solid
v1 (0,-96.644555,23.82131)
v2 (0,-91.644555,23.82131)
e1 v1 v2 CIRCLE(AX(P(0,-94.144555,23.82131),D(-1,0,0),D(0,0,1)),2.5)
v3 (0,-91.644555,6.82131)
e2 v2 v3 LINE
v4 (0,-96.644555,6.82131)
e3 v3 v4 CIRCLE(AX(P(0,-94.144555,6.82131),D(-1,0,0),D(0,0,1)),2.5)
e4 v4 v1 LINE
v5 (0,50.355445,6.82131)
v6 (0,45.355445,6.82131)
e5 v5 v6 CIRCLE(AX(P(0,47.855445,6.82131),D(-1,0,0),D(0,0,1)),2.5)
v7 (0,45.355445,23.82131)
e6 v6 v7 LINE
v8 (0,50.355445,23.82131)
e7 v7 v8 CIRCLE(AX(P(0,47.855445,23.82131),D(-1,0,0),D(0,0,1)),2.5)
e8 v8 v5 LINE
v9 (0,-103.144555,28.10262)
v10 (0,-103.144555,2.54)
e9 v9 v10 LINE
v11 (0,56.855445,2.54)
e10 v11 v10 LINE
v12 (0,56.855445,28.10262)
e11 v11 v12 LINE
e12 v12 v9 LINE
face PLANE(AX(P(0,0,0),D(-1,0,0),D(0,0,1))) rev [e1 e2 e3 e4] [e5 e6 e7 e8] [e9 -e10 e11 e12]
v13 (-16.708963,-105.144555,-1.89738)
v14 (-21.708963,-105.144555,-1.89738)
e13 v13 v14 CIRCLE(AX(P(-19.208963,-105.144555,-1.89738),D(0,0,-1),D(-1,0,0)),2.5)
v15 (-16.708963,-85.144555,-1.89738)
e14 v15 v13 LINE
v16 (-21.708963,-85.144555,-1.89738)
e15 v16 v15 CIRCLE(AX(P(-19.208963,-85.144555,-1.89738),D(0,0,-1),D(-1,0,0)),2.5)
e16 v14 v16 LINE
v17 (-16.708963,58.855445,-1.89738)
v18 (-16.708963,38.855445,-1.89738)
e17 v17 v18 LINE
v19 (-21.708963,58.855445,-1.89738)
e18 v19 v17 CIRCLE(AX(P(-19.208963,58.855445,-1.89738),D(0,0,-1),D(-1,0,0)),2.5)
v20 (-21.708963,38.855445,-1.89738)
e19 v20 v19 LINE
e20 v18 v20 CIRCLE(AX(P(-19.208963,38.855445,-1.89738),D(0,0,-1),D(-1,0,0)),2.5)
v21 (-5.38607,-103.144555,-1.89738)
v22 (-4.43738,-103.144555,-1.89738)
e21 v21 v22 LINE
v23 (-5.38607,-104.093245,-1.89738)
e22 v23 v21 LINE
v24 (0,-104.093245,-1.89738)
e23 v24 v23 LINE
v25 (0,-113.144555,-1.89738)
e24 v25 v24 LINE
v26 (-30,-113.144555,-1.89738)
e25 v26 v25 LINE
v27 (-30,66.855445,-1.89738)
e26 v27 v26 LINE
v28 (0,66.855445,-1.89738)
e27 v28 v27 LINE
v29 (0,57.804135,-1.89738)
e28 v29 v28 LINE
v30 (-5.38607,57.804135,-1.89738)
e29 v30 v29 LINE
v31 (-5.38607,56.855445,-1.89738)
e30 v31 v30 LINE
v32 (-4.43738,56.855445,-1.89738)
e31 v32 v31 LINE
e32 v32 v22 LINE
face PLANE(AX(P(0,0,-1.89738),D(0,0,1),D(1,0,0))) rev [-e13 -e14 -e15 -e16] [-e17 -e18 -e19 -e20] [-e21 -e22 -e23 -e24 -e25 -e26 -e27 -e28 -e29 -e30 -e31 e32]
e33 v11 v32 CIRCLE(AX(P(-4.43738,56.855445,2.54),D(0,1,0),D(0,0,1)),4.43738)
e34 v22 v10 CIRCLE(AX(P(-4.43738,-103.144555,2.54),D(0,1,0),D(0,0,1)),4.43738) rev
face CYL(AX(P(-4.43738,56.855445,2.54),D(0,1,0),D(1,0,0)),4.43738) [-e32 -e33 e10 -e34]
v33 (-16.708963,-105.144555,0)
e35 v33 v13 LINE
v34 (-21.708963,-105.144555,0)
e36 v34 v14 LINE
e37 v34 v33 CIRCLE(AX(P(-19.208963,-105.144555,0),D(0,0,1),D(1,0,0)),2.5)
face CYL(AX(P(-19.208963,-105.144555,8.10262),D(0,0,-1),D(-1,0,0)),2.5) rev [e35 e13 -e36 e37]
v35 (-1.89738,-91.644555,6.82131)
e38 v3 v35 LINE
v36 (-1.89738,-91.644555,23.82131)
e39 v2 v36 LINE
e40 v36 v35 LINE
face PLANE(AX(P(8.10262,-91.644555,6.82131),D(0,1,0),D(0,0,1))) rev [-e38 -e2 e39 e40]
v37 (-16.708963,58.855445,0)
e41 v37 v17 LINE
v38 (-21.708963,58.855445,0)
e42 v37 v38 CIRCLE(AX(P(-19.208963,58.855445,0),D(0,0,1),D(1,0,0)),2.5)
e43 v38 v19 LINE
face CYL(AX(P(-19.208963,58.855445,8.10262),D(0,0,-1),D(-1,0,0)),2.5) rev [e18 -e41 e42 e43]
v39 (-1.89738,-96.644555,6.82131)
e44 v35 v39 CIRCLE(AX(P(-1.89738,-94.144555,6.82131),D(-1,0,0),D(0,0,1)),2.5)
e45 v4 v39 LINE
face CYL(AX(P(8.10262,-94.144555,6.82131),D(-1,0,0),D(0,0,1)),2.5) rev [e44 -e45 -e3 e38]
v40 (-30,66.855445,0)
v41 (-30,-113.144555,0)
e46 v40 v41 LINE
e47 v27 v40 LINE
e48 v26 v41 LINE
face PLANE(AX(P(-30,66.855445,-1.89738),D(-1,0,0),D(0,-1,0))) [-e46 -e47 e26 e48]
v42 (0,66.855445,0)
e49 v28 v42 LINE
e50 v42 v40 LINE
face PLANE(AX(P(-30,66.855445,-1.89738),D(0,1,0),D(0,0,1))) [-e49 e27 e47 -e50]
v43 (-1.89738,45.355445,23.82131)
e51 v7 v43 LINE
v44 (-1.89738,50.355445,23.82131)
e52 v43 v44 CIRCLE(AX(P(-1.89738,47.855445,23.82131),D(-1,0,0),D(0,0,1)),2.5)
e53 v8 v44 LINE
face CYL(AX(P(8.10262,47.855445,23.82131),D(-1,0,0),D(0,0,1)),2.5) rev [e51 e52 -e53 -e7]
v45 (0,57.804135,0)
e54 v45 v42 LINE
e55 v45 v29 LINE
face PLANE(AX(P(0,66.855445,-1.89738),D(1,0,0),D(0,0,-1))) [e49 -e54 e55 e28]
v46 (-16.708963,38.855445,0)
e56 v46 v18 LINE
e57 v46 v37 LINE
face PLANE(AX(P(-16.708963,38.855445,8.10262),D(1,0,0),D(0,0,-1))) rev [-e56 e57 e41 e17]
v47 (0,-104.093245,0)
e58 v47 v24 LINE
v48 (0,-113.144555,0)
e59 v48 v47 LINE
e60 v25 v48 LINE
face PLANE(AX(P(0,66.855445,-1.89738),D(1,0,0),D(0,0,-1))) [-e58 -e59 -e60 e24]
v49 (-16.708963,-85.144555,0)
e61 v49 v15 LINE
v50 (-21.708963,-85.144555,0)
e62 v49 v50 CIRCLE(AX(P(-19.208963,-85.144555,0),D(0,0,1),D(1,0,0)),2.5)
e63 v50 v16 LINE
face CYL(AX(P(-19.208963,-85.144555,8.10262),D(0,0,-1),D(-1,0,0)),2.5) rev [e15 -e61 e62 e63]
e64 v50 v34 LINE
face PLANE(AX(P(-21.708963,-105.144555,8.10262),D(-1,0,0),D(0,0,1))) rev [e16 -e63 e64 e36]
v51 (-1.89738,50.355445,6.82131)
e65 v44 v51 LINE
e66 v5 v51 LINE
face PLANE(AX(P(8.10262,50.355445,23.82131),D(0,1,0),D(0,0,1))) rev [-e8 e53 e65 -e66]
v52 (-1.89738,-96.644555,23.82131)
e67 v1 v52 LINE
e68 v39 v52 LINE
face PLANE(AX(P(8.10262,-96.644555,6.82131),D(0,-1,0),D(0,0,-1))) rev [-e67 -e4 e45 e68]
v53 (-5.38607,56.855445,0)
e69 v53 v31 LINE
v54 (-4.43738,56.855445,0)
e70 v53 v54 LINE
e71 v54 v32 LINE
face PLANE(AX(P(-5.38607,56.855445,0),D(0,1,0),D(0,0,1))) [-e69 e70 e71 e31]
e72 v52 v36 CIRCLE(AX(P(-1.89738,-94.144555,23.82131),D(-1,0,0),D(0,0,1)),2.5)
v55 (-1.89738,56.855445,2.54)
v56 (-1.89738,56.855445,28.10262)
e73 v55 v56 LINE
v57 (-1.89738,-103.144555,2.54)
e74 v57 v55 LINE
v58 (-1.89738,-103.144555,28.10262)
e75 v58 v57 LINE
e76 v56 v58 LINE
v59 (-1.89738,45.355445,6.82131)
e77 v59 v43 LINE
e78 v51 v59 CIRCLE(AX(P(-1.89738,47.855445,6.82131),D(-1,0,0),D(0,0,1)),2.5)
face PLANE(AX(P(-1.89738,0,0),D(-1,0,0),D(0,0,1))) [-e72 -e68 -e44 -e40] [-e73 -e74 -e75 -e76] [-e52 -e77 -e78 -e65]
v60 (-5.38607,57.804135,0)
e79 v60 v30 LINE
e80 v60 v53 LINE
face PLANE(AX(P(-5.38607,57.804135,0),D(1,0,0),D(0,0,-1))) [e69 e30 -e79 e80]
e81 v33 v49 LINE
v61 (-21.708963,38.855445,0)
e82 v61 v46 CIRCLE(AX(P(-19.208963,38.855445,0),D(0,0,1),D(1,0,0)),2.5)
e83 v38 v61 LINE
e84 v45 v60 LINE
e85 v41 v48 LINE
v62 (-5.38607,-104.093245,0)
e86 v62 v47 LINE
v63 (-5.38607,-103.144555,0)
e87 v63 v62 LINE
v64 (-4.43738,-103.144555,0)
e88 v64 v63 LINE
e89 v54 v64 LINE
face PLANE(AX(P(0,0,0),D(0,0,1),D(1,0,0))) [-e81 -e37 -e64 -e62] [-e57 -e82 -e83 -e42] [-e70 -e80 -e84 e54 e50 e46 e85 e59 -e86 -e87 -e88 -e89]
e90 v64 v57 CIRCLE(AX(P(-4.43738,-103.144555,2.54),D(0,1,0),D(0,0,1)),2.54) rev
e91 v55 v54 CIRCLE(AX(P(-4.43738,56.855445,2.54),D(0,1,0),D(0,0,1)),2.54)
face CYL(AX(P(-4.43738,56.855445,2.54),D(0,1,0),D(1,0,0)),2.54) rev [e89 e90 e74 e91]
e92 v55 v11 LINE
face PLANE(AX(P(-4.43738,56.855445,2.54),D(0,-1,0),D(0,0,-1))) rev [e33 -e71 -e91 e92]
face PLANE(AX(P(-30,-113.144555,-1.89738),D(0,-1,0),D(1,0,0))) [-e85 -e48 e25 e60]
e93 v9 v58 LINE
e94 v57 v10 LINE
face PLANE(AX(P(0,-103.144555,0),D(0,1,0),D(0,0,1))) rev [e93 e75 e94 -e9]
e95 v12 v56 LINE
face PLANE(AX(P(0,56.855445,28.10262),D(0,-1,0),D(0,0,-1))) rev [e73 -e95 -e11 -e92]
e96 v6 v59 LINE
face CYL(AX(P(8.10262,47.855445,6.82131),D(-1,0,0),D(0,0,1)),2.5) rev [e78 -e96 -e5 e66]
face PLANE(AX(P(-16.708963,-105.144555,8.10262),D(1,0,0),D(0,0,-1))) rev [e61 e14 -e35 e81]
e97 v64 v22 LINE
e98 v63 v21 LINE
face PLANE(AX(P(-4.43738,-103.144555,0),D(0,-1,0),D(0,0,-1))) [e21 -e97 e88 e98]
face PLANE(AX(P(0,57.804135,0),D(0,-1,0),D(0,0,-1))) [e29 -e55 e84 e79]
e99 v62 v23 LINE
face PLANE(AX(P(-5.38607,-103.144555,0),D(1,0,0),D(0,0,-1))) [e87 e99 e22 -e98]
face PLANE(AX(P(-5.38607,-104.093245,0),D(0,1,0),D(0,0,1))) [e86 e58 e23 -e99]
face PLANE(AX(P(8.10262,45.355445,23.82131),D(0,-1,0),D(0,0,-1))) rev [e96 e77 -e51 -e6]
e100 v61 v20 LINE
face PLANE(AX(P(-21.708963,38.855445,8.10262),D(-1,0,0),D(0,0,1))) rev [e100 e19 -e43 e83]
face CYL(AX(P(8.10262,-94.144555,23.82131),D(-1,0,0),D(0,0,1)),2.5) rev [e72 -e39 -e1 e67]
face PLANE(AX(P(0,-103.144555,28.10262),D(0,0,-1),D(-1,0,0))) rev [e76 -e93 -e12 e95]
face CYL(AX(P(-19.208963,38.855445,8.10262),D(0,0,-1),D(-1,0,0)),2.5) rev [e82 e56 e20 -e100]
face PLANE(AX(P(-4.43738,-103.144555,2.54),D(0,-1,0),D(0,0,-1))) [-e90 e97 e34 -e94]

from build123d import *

# Parameters (mm, degrees)
SKETCH1_W                     = 30
SKETCH1_H                     = 180
BASE_FLANGE1_DEPTH            = 1.89738
EDGE_FLANGE1_STRIP_W          = 12.66952
EDGE_FLANGE1_STRIP_H          = 1.89738
EDGE_FLANGE1_STRIP_CUT_DEPTH  = 160
EDGE_FLANGE1_RELIEF_W         = 13.61821
EDGE_FLANGE1_RELIEF_H         = 0.94869
EDGE_FLANGE1_RELIEF_CUT_DEPTH = 1.89738
EDGE_FLANGE1_DEPTH            = 160
CUT_EXTRUDE1_DEPTH            = 10
CUT_EXTRUDE2_DEPTH            = 10


# Sheet-metal steps are written as plain solids
with BuildPart() as part:
    # Sketch1 → Base-Flange1 (new body)
    with BuildSketch(Plane.XY):
        with Locations((-15, -23.144555198)):
            Rectangle(SKETCH1_W, SKETCH1_H)
    extrude(amount=-BASE_FLANGE1_DEPTH)

    # Edge-Flange1 strip (across the edge) → Edge-Flange1 strip cut (cut)
    with BuildSketch(Plane(origin=(0, -103.144555198, 0), x_dir=(-1, 0, 0), z_dir=(0, 1, 0))):
        with Locations((-1.89738, -0.94869)):
            Rectangle(EDGE_FLANGE1_STRIP_W, EDGE_FLANGE1_STRIP_H)
    extrude(amount=EDGE_FLANGE1_STRIP_CUT_DEPTH, mode=Mode.SUBTRACT)

    # Edge-Flange1 relief (on the sheet) → Edge-Flange1 relief cut (cut)
    with BuildSketch(Plane(origin=(-4.43738, -103.144555198, 0), x_dir=(-1, 0, 0), z_dir=(0, 0, 1))):
        with Locations((-5.860415, 0.474345)):
            Rectangle(EDGE_FLANGE1_RELIEF_W, EDGE_FLANGE1_RELIEF_H)
        with Locations((-5.860415, -160.474345)):
            Rectangle(EDGE_FLANGE1_RELIEF_W, EDGE_FLANGE1_RELIEF_H)
    extrude(amount=-EDGE_FLANGE1_RELIEF_CUT_DEPTH, mode=Mode.SUBTRACT)

    # Edge-Flange1 section (across the edge) → Edge-Flange1 (add)
    with BuildSketch(Plane(origin=(0, -103.144555198, 0), x_dir=(-1, 0, 0), z_dir=(0, 1, 0))):
        with BuildLine():
            Line((0, 2.54), (0, 28.10262))
            Line((0, 28.10262), (1.89738, 28.10262))
            Line((1.89738, 28.10262), (1.89738, 2.54))
            ThreePointArc((1.89738, 2.54), (2.641328776, 0.743948776), (4.43738, 0))
            Line((4.43738, 0), (4.43738, -1.89738))
            ThreePointArc((4.43738, -1.89738), (1.299678511, -0.597701489), (0, 2.54))
        make_face()
    extrude(amount=EDGE_FLANGE1_DEPTH)

    # Sketch9 → Cut-Extrude1 (cut)
    with BuildSketch(Plane.ZY.offset(1.89738)):
        with BuildLine():
            Line((23.82131, 45.355444802), (6.82131, 45.355444802))
            ThreePointArc((6.82131, 45.355444802), (4.32131, 47.855444802), (6.82131, 50.355444802))
            Line((6.82131, 50.355444802), (23.82131, 50.355444802))
            ThreePointArc((23.82131, 50.355444802), (26.32131, 47.855444802), (23.82131, 45.355444802))
        make_face()
        with BuildLine():
            Line((6.82131, -91.644555198), (23.82131, -91.644555198))
            ThreePointArc((23.82131, -91.644555198), (26.32131, -94.144555198), (23.82131, -96.644555198))
            Line((23.82131, -96.644555198), (6.82131, -96.644555198))
            ThreePointArc((6.82131, -96.644555198), (4.32131, -94.144555198), (6.82131, -91.644555198))
        make_face()
    extrude(amount=-CUT_EXTRUDE1_DEPTH, mode=Mode.SUBTRACT)

    # Sketch11 → Cut-Extrude2 (cut)
    with BuildSketch(Plane(origin=(0, 0, -1.89738), x_dir=(-1, 0, 0), z_dir=(0, 0, -1))):
        with BuildLine():
            Line((16.708962543, -105.144555198), (16.708962543, -85.144555198))
            ThreePointArc((16.708962543, -85.144555198), (19.208962543, -82.644555198), (21.708962543, -85.144555198))
            Line((21.708962543, -85.144555198), (21.708962543, -105.144555198))
            ThreePointArc((21.708962543, -105.144555198), (19.208962543, -107.644555198), (16.708962543, -105.144555198))
        make_face()
        with BuildLine():
            Line((16.708962543, 38.855444802), (16.708962543, 58.855444802))
            ThreePointArc((16.708962543, 58.855444802), (19.208962543, 61.355444802), (21.708962543, 58.855444802))
            Line((21.708962543, 58.855444802), (21.708962543, 38.855444802))
            ThreePointArc((21.708962543, 38.855444802), (19.208962543, 36.355444802), (16.708962543, 38.855444802))
        make_face()
    extrude(amount=-CUT_EXTRUDE2_DEPTH, mode=Mode.SUBTRACT)


solid = part.part
